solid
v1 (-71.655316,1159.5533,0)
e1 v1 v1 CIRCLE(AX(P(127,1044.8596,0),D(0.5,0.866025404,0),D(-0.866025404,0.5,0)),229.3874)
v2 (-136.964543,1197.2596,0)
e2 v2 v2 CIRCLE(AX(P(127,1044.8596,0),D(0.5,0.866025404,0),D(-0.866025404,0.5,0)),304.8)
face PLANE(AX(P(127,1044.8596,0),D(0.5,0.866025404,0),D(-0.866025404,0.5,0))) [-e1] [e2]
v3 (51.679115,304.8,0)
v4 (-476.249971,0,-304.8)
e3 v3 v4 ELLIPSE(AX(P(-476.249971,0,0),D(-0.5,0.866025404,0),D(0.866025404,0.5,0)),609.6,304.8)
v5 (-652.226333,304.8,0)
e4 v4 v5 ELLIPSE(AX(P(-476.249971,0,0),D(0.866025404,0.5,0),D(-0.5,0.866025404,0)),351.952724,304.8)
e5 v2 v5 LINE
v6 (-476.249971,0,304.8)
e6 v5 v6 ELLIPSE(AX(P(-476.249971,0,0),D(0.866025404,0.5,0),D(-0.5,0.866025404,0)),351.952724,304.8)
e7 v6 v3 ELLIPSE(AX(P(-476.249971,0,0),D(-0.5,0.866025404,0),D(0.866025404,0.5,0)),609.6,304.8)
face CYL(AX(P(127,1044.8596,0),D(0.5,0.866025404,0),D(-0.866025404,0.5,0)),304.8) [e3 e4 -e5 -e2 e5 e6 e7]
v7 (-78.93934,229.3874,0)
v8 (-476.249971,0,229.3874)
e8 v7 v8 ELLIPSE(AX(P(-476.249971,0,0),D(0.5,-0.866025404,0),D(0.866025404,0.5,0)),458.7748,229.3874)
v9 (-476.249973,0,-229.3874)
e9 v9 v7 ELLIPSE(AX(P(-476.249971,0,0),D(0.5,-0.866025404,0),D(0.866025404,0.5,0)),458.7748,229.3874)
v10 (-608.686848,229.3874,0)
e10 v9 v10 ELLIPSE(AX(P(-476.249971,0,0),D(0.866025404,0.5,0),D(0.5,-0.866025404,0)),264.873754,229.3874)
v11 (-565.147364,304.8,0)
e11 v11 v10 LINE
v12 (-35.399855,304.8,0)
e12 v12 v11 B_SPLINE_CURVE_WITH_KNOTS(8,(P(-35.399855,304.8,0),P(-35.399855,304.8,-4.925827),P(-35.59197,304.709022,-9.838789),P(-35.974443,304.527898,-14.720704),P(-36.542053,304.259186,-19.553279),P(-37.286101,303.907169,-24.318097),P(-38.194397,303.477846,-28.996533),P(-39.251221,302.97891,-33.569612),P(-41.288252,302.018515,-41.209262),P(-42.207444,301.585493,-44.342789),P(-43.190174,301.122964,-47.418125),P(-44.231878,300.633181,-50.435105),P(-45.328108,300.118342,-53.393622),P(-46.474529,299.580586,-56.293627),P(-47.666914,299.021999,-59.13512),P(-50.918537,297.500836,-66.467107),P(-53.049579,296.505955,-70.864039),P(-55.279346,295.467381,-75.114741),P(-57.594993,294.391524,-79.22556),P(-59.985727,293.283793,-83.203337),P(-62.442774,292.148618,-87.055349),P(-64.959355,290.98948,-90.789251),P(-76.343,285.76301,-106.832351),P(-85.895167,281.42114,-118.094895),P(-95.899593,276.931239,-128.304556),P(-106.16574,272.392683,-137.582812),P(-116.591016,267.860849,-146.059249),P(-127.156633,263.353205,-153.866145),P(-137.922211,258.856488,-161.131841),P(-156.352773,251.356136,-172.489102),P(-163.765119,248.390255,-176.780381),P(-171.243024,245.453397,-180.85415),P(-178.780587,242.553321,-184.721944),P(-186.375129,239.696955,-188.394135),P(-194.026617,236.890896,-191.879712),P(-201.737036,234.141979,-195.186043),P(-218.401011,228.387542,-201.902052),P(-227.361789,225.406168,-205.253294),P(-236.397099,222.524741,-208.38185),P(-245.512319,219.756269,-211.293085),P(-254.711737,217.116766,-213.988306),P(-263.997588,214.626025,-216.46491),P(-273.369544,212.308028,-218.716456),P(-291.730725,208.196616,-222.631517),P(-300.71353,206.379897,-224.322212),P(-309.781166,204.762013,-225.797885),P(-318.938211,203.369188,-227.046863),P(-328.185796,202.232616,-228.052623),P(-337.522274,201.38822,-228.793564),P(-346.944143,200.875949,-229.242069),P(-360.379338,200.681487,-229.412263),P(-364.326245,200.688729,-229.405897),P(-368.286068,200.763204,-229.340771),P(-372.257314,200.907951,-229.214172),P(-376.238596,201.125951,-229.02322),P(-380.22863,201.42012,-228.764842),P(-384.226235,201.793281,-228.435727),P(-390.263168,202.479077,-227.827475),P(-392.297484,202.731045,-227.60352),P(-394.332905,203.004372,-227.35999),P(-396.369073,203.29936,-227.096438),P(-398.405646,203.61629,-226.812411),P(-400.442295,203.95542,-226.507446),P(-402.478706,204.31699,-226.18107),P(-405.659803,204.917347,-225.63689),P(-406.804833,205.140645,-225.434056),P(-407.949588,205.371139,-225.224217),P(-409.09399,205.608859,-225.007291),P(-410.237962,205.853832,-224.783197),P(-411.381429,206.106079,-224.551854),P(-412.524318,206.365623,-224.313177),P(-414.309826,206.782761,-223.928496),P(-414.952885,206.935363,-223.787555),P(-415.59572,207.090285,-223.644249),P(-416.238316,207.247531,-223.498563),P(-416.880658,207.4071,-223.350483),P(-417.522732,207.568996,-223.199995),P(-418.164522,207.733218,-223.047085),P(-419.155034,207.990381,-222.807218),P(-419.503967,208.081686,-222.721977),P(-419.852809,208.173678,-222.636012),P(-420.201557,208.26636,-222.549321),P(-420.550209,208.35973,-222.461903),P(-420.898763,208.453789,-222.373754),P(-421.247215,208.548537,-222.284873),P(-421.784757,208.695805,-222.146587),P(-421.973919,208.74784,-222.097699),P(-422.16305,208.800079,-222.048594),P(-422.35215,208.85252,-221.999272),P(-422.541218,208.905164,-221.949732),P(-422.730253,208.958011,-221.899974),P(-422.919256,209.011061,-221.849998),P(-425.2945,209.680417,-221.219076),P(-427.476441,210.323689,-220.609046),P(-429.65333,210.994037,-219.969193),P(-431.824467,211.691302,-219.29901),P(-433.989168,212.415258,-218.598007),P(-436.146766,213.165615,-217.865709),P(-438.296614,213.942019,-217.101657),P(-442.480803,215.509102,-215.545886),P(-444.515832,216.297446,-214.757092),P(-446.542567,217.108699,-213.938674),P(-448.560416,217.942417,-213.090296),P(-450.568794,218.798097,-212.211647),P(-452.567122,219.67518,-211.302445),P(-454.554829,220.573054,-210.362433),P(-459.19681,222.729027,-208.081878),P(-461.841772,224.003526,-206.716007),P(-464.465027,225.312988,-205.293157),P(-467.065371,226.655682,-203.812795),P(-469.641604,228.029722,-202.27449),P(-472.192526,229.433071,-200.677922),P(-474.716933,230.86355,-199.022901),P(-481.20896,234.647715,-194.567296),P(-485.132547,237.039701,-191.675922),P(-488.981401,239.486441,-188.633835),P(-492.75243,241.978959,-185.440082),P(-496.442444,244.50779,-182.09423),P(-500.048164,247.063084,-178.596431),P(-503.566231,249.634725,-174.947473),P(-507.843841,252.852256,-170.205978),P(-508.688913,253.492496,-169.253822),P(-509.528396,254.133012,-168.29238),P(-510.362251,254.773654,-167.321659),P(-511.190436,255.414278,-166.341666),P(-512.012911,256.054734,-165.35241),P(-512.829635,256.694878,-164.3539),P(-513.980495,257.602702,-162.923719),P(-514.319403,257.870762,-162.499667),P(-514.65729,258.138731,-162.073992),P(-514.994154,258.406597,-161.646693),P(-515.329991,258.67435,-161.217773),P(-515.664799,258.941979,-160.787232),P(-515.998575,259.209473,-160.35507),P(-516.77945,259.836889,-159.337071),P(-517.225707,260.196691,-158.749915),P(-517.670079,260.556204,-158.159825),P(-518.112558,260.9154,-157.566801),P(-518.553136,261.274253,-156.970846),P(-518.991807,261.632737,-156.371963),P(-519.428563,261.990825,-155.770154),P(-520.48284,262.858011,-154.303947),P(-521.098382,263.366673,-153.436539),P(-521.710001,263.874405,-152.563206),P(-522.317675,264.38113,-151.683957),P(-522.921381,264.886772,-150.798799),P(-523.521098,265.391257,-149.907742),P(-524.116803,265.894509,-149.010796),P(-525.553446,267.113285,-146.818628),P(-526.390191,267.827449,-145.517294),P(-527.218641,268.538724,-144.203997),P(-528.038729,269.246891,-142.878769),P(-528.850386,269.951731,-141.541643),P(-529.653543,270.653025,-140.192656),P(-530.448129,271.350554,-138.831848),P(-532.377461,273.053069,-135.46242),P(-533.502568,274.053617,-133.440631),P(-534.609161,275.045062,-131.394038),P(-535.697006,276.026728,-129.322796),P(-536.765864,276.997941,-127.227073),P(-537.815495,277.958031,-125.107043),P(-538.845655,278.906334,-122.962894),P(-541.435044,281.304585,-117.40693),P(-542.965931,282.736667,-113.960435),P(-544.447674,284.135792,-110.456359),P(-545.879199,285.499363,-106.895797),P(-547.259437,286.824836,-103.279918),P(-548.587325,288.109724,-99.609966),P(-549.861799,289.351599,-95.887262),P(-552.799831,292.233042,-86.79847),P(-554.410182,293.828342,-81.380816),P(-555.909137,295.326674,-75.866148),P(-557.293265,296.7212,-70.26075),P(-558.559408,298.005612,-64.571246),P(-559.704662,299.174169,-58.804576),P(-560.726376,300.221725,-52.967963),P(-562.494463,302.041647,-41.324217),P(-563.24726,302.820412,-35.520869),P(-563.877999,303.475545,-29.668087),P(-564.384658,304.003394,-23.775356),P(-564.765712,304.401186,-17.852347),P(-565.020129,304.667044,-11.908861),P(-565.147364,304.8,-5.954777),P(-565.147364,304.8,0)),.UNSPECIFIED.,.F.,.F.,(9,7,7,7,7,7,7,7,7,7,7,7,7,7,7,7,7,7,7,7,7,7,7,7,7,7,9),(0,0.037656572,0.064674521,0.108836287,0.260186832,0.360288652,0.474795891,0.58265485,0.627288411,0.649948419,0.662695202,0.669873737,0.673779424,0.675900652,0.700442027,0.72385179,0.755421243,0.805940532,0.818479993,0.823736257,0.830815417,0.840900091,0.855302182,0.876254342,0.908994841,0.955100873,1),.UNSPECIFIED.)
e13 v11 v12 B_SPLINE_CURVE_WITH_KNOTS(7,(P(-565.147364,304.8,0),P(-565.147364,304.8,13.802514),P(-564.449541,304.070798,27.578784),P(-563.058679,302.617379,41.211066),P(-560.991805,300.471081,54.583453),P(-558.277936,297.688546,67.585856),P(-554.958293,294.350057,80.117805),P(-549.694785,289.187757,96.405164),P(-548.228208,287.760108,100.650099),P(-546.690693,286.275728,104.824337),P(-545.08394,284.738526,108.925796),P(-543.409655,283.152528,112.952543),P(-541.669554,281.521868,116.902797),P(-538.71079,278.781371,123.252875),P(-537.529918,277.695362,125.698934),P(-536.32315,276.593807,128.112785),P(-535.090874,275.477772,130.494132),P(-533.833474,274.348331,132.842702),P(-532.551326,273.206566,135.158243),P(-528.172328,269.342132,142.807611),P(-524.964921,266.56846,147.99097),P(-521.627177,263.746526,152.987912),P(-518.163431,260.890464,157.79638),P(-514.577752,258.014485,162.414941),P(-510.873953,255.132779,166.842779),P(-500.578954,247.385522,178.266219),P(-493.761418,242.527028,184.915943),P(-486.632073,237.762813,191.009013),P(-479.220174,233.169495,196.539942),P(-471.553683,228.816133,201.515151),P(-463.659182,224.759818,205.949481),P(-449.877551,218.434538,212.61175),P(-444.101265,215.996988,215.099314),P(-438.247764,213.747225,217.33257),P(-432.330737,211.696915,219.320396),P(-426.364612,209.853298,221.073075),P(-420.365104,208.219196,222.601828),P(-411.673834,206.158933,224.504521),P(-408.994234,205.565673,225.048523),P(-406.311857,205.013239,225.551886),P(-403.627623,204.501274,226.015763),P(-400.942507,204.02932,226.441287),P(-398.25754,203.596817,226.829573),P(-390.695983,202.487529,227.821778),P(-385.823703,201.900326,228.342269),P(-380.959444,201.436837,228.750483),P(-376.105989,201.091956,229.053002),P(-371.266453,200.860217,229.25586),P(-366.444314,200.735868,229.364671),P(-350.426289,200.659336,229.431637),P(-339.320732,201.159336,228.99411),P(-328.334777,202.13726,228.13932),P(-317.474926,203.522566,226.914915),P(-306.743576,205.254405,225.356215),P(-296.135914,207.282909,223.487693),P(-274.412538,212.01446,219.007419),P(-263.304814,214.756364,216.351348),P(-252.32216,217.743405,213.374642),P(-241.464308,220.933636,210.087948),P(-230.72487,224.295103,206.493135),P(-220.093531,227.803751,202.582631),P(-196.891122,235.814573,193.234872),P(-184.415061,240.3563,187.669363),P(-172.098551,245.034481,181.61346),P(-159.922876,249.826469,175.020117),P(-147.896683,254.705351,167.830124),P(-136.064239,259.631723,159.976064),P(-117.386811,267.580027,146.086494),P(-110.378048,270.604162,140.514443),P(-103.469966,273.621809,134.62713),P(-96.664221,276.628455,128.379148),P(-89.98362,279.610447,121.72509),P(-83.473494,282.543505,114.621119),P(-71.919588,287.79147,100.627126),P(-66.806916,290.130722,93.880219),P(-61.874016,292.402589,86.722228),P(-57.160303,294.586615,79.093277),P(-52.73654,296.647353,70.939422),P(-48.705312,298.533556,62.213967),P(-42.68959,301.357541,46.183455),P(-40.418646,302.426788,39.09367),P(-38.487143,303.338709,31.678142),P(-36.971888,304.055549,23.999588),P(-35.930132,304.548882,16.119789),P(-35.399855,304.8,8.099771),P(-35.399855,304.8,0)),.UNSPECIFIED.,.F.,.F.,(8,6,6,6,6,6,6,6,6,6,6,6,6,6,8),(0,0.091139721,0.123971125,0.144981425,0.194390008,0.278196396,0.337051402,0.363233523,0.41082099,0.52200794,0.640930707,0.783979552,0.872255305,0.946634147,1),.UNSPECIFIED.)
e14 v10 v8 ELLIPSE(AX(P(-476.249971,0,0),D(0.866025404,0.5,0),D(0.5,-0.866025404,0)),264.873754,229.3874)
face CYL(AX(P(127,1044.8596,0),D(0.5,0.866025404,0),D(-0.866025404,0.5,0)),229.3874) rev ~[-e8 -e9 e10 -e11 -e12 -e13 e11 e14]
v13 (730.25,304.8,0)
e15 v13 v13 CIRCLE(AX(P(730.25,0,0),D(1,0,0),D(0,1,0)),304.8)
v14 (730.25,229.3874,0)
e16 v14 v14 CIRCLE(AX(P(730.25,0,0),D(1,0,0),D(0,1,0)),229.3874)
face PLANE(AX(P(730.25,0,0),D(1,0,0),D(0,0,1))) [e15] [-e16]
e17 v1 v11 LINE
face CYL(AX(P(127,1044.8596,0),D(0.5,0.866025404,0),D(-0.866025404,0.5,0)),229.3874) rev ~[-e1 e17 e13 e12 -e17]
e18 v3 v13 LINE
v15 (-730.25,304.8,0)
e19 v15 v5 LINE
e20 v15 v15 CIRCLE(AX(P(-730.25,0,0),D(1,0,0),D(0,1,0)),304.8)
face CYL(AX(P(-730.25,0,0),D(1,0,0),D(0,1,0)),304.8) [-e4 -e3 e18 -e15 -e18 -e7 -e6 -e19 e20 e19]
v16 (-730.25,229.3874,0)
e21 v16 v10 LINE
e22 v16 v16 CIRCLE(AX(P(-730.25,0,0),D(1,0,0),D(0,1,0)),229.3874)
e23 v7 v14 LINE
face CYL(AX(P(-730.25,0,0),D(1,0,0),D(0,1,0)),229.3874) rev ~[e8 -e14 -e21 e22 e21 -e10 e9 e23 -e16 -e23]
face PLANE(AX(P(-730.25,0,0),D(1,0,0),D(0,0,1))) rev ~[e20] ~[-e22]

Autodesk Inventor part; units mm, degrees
ref_plane "YZ Plane" through (0, 0, 0) normal (1, 0, 0) x (0, 1, 0)
ref_plane "XZ Plane" through (0, 0, 0) normal (0, 1, 0) x (-1, 0, 0)
sketch "Sweep Sketch" plane through (0, 0, 0) normal (0, 0, 1) x (1, 0, 0)
  line L0 (-730.25, 0) -> (730.25, 0)
  line L1 (-476.25, 0) -> (127, 1044.8596)
  point P0 (0, 0)
  point P1 (0, 0)
  dimension "B_Dimension" = 1206.5
  dimension "C_Dimension" = 254
  dimension "A_Dimension" = 1206.5
  dimension "angle" = 60
sketch "Base Tube Profile Sketch" plane through (0, 0, 0) normal (1, 0, 0) x (0, 1, 0)
  circle A0 centre (0, 0) radius 304.8
  circle A1 centre (0, 0) radius 229.3874
  dimension "baseOD" = 609.6
  dimension "wallThickness" = 75.4126
sweep "Sweep1" add profiles "Base Tube Profile Sketch" path "Sweep Sketch" path curves L0
ref_plane "Lateral Sketch Plane" through (127, 1044.8596, 0) normal (0.5, 0.8660254, 0) x (-0.8660254, 0.5, 0)
sketch "Lateral Tube Profile Sketch" plane through (127, 1044.8596, 0) normal (0.5, 0.8660254, 0) x (-0.8660254, 0.5, 0)
  circle A0 centre (0, 0) radius 304.8
  circle A1 centre (0, 0) radius 229.3874
  point P0 (-412.4446, 0)
  dimension "lateralOD" = 609.6
  dimension "lateralWallThickness" = 75.4126
extrude "Extrusion1" add sketch "Lateral Tube Profile Sketch" against normal up to surface
extrude "Extrusion2" cut sketch "Lateral Tube Profile Sketch" against normal up to surface contours A1 surface through (0, 0, 0) normal (0, 1, 0)
equation "\"lateralOD\" = baseOD"
equation "\"lateralWallThickness\" = wallThickness"
equation "\"nominalSize\" = 609.6"
properties part number "LAT-S24-SCH160-60"
